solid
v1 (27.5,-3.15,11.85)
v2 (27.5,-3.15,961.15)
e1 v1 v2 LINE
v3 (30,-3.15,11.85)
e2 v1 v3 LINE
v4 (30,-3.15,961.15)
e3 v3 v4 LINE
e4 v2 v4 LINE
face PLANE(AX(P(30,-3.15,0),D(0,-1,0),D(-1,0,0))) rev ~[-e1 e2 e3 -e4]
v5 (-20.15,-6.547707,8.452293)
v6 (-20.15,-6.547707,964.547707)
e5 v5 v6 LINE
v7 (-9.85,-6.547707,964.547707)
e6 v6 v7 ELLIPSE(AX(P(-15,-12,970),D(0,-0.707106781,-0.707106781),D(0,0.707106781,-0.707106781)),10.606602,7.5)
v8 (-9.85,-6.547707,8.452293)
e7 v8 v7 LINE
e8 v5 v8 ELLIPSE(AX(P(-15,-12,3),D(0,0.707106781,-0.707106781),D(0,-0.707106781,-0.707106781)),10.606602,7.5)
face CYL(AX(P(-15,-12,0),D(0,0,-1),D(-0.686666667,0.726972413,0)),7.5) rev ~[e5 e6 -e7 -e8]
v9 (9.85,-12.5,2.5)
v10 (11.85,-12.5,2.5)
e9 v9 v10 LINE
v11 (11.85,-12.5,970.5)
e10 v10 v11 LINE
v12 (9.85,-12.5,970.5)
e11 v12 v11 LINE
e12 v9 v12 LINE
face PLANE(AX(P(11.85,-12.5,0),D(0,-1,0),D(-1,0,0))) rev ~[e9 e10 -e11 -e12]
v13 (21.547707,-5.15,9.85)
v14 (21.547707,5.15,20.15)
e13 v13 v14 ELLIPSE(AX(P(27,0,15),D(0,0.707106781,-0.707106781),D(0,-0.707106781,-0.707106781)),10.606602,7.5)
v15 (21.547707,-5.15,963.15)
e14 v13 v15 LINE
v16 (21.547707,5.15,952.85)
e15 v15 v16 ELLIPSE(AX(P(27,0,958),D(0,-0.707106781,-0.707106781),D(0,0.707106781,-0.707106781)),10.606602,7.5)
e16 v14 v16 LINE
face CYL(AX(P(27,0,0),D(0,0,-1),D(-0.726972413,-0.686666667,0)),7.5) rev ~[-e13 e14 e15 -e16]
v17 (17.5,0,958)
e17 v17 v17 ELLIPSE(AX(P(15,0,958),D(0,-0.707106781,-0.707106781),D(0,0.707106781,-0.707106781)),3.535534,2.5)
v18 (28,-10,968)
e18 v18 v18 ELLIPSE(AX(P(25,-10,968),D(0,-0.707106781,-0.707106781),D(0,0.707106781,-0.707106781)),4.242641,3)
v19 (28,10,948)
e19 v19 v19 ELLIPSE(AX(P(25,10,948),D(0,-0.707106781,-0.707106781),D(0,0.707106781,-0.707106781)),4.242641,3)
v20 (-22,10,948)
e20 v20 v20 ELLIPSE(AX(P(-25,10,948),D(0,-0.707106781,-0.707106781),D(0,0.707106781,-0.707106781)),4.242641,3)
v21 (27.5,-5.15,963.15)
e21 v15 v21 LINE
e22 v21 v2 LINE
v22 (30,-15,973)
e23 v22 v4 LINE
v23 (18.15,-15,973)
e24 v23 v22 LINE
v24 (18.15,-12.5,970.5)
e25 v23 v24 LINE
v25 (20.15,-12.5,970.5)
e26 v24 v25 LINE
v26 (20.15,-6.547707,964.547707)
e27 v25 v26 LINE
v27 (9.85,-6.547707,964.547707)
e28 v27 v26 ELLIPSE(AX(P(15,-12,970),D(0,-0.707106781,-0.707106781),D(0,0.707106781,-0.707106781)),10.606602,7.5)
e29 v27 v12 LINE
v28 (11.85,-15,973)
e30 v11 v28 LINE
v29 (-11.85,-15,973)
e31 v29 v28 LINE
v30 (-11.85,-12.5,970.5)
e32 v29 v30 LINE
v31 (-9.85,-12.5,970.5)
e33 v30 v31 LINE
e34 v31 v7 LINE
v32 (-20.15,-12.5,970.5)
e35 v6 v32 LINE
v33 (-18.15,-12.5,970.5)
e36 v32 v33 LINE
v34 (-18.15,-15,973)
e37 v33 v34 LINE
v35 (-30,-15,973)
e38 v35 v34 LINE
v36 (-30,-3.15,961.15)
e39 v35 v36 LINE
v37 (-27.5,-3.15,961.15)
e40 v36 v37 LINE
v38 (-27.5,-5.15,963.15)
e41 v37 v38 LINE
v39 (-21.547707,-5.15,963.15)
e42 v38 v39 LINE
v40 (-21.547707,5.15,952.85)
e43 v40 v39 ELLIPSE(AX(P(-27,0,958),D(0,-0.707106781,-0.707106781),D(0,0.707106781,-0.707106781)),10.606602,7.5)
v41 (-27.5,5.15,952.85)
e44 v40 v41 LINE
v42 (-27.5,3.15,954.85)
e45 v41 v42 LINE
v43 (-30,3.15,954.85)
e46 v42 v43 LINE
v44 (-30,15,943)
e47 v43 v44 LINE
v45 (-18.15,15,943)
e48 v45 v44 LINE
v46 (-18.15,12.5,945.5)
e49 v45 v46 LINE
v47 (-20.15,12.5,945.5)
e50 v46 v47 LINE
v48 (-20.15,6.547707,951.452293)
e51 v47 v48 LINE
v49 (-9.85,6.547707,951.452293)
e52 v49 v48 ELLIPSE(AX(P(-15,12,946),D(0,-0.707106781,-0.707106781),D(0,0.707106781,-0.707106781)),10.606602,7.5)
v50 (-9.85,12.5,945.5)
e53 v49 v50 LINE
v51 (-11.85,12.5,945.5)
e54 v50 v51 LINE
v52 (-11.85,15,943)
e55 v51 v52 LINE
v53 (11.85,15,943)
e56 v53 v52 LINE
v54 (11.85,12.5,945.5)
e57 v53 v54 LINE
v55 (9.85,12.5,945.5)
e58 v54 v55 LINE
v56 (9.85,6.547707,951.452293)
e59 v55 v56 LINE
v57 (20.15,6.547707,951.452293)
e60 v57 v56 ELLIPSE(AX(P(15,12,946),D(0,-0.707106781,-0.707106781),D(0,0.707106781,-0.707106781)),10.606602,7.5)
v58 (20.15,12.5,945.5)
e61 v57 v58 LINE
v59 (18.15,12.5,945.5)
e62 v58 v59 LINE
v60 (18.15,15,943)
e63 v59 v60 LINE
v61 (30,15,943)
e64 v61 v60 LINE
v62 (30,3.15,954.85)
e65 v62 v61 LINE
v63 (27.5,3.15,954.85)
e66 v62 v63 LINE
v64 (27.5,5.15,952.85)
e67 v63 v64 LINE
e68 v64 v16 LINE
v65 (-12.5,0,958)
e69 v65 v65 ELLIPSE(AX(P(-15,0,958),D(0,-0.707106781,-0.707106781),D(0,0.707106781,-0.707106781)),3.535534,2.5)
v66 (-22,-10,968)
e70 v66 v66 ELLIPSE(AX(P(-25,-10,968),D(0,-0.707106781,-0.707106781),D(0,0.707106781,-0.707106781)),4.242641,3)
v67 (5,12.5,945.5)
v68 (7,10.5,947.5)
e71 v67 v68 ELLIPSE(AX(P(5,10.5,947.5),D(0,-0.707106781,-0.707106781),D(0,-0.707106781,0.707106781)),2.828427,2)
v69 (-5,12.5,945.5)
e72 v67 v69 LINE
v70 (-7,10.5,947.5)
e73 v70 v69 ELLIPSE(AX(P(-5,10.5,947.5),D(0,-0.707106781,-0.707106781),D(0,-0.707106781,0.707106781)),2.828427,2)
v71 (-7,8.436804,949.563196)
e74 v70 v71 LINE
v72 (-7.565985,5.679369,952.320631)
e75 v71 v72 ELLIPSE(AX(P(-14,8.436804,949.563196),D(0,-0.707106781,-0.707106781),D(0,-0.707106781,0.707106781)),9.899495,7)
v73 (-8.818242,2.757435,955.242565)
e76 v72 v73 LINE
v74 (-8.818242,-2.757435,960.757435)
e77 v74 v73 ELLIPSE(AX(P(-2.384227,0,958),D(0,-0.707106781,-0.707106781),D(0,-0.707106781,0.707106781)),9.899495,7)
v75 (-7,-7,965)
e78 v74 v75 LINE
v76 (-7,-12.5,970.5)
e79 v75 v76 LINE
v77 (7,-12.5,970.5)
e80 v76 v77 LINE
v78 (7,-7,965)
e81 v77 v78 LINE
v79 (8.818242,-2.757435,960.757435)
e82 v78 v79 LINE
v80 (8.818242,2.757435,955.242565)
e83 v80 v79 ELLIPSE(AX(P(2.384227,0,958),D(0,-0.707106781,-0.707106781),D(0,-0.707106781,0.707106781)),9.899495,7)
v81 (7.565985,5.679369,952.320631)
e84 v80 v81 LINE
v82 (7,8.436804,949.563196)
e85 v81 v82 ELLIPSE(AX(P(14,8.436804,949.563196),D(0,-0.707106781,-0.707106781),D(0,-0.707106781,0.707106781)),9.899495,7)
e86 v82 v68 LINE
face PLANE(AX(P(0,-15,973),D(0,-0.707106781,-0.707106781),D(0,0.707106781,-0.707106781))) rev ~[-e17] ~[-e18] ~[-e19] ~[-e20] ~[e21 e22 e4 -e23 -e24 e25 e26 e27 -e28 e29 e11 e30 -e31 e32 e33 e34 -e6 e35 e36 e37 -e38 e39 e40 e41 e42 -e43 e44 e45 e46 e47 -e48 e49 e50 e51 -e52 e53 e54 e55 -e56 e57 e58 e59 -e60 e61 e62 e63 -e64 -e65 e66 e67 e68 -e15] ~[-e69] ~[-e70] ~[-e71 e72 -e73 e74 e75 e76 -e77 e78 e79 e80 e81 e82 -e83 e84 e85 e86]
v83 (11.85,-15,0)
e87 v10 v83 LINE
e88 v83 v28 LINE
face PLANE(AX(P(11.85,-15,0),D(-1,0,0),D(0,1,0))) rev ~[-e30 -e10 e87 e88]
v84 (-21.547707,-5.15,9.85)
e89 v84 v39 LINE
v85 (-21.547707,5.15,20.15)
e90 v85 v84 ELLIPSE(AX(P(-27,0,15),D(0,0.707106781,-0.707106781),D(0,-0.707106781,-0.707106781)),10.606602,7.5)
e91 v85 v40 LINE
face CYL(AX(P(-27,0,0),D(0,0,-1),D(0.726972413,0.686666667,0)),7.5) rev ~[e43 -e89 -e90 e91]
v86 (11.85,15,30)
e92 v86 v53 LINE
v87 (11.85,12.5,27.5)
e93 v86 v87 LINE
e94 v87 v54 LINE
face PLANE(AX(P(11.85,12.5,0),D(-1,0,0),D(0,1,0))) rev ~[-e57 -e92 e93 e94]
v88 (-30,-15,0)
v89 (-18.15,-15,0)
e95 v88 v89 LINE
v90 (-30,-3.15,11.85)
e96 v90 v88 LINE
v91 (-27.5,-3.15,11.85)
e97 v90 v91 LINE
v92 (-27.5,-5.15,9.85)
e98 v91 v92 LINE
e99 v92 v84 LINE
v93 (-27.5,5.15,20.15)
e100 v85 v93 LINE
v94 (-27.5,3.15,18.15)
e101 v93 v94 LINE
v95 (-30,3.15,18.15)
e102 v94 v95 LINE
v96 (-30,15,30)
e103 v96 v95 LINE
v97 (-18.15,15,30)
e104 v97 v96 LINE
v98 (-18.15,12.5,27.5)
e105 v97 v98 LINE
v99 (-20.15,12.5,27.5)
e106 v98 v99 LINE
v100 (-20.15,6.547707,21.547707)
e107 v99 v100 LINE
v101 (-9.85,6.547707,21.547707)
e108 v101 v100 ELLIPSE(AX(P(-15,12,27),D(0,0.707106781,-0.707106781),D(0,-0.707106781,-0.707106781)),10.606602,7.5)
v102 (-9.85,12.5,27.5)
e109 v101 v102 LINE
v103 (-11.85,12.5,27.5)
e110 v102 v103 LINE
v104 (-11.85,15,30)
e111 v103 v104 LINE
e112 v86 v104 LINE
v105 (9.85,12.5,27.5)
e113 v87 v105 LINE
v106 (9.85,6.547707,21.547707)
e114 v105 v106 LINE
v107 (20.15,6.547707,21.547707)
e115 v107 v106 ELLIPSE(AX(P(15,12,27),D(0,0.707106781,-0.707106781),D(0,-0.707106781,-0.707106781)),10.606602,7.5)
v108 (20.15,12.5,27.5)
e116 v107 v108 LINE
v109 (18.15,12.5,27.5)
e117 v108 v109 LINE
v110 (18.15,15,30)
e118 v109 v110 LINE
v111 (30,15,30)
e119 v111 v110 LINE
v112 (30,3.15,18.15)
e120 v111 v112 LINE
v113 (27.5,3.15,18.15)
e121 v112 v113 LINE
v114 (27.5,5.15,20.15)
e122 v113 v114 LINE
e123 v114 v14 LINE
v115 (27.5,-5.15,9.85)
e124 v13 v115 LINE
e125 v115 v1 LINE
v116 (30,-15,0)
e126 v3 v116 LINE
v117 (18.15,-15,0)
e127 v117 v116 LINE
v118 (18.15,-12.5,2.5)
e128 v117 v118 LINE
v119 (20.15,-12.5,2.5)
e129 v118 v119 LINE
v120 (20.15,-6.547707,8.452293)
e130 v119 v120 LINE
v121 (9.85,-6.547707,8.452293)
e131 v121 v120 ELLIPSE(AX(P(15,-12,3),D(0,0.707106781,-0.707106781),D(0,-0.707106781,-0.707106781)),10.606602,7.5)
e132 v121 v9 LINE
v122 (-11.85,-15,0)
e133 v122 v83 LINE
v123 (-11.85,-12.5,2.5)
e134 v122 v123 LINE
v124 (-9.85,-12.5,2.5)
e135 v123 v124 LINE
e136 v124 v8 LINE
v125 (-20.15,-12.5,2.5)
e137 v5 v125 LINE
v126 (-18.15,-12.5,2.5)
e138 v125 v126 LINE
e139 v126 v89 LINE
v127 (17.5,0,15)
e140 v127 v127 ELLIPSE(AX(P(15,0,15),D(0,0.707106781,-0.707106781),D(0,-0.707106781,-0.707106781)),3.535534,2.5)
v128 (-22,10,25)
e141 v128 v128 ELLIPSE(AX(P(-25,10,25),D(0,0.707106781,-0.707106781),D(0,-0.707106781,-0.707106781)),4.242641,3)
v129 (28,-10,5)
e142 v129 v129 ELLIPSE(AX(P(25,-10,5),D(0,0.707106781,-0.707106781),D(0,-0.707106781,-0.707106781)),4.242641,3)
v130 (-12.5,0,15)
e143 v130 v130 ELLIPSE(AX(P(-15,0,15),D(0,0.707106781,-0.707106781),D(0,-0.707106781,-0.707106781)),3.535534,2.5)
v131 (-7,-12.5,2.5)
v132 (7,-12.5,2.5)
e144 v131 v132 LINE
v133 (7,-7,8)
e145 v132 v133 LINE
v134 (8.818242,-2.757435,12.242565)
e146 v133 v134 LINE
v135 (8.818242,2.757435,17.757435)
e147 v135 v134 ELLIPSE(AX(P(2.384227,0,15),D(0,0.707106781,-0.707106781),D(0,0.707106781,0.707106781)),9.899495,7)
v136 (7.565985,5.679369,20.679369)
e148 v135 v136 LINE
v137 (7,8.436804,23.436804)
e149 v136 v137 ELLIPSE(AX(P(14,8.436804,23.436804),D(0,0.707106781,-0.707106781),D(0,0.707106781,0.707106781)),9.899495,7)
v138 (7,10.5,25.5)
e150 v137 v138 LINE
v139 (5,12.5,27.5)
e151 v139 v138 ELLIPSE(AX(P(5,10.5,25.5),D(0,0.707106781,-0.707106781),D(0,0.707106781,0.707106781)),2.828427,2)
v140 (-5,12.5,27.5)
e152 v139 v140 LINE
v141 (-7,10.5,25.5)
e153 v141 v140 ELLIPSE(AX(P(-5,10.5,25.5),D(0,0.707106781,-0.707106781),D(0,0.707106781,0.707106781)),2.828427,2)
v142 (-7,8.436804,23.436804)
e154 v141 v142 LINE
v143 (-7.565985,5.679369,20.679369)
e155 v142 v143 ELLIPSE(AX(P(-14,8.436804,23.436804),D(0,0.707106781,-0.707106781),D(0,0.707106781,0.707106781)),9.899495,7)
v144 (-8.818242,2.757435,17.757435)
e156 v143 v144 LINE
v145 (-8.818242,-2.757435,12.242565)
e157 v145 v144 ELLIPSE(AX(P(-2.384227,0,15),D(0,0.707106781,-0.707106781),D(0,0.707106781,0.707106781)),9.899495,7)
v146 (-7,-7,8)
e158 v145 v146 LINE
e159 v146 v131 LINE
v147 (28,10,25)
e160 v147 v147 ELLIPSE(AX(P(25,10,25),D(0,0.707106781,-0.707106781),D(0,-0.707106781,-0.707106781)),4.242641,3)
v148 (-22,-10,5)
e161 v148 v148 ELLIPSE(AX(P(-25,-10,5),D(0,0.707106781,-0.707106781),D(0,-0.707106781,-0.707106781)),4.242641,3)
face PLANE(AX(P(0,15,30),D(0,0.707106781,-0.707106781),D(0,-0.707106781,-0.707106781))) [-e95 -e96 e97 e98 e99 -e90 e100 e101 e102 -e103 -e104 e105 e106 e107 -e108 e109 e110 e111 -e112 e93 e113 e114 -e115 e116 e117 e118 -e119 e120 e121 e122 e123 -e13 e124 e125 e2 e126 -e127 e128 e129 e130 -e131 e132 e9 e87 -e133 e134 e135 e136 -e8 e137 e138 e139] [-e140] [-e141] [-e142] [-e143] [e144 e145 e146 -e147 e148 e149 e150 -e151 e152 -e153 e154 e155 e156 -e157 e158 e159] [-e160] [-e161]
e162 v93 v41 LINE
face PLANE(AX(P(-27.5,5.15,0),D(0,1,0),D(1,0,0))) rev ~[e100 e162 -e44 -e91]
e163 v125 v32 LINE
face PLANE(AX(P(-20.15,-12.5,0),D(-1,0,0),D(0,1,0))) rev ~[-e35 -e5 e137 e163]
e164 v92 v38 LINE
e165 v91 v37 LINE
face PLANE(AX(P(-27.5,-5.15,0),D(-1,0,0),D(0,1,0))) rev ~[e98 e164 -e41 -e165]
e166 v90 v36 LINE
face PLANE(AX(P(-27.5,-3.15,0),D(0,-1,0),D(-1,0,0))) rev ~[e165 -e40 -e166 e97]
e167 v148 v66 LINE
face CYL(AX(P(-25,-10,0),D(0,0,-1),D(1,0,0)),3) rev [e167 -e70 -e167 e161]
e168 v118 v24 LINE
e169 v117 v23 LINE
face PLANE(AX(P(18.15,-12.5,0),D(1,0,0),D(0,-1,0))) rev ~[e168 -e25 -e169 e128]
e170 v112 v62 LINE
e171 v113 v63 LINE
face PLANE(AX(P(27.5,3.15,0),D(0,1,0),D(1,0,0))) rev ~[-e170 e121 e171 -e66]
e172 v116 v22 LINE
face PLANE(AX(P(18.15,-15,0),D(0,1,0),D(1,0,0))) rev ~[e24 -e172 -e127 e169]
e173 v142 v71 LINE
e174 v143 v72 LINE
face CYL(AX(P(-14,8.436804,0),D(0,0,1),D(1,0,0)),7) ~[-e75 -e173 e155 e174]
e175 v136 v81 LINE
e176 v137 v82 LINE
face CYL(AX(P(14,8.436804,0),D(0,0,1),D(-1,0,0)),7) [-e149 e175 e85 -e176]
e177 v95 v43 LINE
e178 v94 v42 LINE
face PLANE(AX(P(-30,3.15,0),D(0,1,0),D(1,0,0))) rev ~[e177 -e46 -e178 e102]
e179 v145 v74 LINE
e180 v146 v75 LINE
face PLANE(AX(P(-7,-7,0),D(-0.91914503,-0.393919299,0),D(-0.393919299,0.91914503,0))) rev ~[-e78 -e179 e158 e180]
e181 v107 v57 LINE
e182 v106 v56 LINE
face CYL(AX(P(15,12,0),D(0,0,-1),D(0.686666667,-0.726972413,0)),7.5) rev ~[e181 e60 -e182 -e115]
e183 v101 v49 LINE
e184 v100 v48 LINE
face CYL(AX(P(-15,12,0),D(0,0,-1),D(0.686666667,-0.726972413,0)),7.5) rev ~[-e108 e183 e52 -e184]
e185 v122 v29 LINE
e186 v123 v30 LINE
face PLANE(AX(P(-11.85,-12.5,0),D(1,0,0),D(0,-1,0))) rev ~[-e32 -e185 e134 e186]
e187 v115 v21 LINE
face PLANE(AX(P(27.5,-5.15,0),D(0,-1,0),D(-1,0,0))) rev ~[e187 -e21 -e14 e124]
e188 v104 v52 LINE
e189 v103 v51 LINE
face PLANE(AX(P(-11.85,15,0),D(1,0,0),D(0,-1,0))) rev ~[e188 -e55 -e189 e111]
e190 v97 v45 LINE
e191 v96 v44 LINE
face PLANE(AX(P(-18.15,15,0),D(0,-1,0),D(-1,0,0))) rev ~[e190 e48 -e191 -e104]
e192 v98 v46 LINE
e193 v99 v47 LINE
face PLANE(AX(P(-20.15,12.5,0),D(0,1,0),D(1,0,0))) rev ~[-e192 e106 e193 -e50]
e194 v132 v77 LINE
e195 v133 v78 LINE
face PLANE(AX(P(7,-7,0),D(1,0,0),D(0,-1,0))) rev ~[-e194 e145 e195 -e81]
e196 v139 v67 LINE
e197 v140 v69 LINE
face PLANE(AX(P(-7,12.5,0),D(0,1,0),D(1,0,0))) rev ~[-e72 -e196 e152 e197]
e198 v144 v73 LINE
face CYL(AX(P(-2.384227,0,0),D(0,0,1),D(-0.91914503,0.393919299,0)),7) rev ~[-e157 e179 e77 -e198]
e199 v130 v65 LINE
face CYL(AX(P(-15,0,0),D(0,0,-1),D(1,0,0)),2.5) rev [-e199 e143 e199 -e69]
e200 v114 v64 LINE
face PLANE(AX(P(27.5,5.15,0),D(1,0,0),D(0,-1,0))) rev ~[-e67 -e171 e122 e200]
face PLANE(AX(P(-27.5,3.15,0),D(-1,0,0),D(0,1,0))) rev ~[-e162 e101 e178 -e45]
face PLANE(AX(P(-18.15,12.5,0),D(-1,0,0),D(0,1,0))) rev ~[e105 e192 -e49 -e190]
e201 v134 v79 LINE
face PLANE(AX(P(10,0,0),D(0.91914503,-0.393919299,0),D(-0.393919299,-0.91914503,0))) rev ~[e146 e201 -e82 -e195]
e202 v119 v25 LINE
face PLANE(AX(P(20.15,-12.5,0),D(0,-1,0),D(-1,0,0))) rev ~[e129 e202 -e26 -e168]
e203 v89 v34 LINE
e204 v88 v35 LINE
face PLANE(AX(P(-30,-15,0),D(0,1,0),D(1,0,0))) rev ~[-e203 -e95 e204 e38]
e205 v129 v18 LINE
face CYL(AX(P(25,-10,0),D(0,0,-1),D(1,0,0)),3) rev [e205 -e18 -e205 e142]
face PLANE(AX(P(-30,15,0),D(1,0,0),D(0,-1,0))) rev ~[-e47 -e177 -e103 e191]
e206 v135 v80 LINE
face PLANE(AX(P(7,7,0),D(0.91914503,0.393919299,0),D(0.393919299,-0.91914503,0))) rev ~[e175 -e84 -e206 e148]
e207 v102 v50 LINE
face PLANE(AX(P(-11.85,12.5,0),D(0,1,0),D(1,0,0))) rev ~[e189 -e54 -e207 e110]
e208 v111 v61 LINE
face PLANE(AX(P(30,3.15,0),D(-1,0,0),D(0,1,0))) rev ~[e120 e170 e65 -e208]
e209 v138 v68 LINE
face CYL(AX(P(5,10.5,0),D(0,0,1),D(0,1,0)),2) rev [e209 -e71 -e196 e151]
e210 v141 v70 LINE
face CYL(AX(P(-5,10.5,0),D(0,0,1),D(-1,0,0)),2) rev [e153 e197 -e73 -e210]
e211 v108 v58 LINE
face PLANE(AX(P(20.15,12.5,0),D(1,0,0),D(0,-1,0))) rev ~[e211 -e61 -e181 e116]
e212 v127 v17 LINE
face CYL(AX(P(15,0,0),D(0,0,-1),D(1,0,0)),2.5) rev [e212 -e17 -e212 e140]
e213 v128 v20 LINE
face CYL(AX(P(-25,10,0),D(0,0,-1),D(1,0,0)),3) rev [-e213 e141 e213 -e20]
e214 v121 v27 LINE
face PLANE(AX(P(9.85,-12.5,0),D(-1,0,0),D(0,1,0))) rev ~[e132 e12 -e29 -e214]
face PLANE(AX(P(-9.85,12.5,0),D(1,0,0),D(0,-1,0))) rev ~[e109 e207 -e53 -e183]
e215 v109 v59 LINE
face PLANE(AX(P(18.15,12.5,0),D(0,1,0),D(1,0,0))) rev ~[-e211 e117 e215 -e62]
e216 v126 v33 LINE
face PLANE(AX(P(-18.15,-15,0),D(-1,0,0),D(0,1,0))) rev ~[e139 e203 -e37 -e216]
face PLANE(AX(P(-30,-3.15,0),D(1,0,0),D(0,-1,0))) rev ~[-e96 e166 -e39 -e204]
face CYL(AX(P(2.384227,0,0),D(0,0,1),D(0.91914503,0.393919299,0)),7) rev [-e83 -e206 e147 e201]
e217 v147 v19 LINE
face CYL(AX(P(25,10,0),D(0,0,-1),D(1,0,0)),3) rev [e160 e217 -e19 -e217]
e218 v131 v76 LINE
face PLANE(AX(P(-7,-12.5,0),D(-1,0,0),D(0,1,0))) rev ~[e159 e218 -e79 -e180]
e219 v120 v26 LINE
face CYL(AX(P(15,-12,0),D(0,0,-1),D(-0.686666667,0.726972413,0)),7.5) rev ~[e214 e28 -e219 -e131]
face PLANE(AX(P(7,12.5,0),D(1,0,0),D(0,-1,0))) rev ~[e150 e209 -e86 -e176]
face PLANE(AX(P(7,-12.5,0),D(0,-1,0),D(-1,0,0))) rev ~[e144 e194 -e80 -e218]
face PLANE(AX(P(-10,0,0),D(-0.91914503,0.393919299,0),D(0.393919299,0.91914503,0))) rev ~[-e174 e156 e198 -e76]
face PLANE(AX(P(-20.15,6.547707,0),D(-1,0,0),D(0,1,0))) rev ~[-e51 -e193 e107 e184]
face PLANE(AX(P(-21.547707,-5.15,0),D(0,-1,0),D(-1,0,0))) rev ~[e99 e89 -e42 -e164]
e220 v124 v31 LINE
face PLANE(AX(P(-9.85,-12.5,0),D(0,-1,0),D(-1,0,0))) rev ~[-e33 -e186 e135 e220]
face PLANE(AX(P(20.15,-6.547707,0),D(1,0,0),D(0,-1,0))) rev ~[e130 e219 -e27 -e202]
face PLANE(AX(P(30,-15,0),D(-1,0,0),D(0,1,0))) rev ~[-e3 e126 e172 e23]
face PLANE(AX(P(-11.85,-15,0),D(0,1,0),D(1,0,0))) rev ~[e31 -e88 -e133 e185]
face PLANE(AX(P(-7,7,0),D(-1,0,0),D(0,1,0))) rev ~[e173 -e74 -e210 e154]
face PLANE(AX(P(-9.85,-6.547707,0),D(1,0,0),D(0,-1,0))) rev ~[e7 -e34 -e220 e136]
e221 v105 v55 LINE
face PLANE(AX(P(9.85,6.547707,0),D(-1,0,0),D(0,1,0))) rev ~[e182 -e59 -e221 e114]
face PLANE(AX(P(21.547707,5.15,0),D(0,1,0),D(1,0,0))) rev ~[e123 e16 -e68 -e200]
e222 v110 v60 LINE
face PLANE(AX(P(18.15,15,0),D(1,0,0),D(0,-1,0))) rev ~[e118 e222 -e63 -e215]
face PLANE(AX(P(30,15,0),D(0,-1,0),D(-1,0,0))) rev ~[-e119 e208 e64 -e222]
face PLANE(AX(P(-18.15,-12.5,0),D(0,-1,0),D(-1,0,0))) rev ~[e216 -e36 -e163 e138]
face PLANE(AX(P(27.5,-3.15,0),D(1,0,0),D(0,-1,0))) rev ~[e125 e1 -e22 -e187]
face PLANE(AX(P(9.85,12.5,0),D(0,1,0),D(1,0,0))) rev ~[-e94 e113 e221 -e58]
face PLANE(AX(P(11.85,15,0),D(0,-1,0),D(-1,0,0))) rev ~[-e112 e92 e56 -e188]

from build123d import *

# Parameters (mm, degrees)
F0_R     = 3
F0_R_2   = 2.5
F1_DEPTH = 973
F2_R     = 2
F3_R     = 7
F5_DEPTH = 30


# Not quite as in the source:
# - a feature names something its author has since deleted; it is built from what else it names


with BuildPart() as f1:
    # F0 (on Top) → F1 (new body)
    with BuildSketch(Plane.XY):
        with BuildLine():
            Line((18.15, -15), (30, -15))
            Line((30, -15), (30, -3.15))
            Line((30, -3.15), (27.5, -3.15))
            Line((27.5, -3.15), (27.5, -5.15))
            Line((27.5, -5.15), (21.5477069044, -5.15))
            ThreePointArc((21.5477069044, -5.15), (19.5, 0), (21.5477069044, 5.15))
            Line((21.5477069044, 5.15), (27.5, 5.15))
            Line((27.5, 5.15), (27.5, 3.15))
            Line((27.5, 3.15), (30, 3.15))
            Line((30, 3.15), (30, 15))
            Line((30, 15), (18.15, 15))
            Line((18.15, 15), (18.15, 12.5))
            Line((18.15, 12.5), (20.15, 12.5))
            Line((20.15, 12.5), (20.15, 6.5477069044))
            ThreePointArc((20.15, 6.5477069044), (15, 4.5), (9.85, 6.5477069044))
            Line((9.85, 6.5477069044), (9.85, 12.5))
            Line((9.85, 12.5), (11.85, 12.5))
            Line((11.85, 12.5), (11.85, 15))
            Line((11.85, 15), (-11.85, 15))
            Line((-11.85, 15), (-11.85, 12.5))
            Line((-11.85, 12.5), (-9.85, 12.5))
            Line((-9.85, 12.5), (-9.85, 6.5477069044))
            ThreePointArc((-9.85, 6.5477069044), (-15, 4.5), (-20.15, 6.5477069044))
            Line((-20.15, 6.5477069044), (-20.15, 12.5))
            Line((-20.15, 12.5), (-18.15, 12.5))
            Line((-18.15, 12.5), (-18.15, 15))
            Line((-18.15, 15), (-30, 15))
            Line((-30, 15), (-30, 3.15))
            Line((-30, 3.15), (-27.5, 3.15))
            Line((-27.5, 3.15), (-27.5, 5.15))
            Line((-27.5, 5.15), (-21.5477069044, 5.15))
            ThreePointArc((-21.5477069044, 5.15), (-19.5, 0), (-21.5477069044, -5.15))
            Line((-21.5477069044, -5.15), (-27.5, -5.15))
            Line((-27.5, -5.15), (-27.5, -3.15))
            Line((-27.5, -3.15), (-30, -3.15))
            Line((-30, -3.15), (-30, -15))
            Line((-30, -15), (-18.15, -15))
            Line((-18.15, -15), (-18.15, -12.5))
            Line((-18.15, -12.5), (-20.15, -12.5))
            Line((-20.15, -12.5), (-20.15, -6.5477069044))
            ThreePointArc((-20.15, -6.5477069044), (-15, -4.5), (-9.85, -6.5477069044))
            Line((-9.85, -6.5477069044), (-9.85, -12.5))
            Line((-9.85, -12.5), (-11.85, -12.5))
            Line((-11.85, -12.5), (-11.85, -15))
            Line((-11.85, -15), (11.85, -15))
            Line((11.85, -15), (11.85, -12.5))
            Line((11.85, -12.5), (9.85, -12.5))
            Line((9.85, -12.5), (9.85, -6.5477069044))
            ThreePointArc((9.85, -6.5477069044), (15, -4.5), (20.15, -6.5477069044))
            Line((20.15, -6.5477069044), (20.15, -12.5))
            Line((20.15, -12.5), (18.15, -12.5))
            Line((18.15, -12.5), (18.15, -15))
        make_face()
        with Locations((-25, -10)):
            Circle(F0_R, mode=Mode.SUBTRACT)
        with Locations((25, -10)):
            Circle(F0_R, mode=Mode.SUBTRACT)
        with Locations((-15, 0)):
            Circle(F0_R_2, mode=Mode.SUBTRACT)
        with Locations((-25, 10)):
            Circle(F0_R, mode=Mode.SUBTRACT)
        Polygon((-7, 7), (-7, 12.5), (0, 12.5), (7, 12.5), (7, 7), (10, 0), (7, -7), (7, -12.5), (0, -12.5), (-7, -12.5), (-7, -7), (-10, 0), align=None, mode=Mode.SUBTRACT)
        with Locations((15, 0)):
            Circle(F0_R_2, mode=Mode.SUBTRACT)
        with Locations((25, 10)):
            Circle(F0_R, mode=Mode.SUBTRACT)
    extrude(amount=F1_DEPTH)

    # F2
    f2_edges = [f1.edges().sort_by_distance(p)[0] for p in [
        (-7, 12.5, 486.5),
        (7, 12.5, 486.5),
    ]]
    fillet(f2_edges, radius=F2_R)

    # F3
    f3_edges = [f1.edges().sort_by_distance(p)[0] for p in [
        (-7, 7, 486.5),
        (-10, 0, 486.5),
        (7, 7, 486.5),
        (10, 0, 486.5),
    ]]
    fillet(f3_edges, radius=F3_R)

    # F4 (on Right) → F5 (cut, symmetric)
    with BuildSketch(Plane.YZ):
        Polygon((15, 30), (-15, 0), (15, 0), align=None)
        Polygon((15, 973), (-15, 973), (15, 943), align=None)
    extrude(amount=F5_DEPTH, both=True, mode=Mode.SUBTRACT)


solid = f1.part
